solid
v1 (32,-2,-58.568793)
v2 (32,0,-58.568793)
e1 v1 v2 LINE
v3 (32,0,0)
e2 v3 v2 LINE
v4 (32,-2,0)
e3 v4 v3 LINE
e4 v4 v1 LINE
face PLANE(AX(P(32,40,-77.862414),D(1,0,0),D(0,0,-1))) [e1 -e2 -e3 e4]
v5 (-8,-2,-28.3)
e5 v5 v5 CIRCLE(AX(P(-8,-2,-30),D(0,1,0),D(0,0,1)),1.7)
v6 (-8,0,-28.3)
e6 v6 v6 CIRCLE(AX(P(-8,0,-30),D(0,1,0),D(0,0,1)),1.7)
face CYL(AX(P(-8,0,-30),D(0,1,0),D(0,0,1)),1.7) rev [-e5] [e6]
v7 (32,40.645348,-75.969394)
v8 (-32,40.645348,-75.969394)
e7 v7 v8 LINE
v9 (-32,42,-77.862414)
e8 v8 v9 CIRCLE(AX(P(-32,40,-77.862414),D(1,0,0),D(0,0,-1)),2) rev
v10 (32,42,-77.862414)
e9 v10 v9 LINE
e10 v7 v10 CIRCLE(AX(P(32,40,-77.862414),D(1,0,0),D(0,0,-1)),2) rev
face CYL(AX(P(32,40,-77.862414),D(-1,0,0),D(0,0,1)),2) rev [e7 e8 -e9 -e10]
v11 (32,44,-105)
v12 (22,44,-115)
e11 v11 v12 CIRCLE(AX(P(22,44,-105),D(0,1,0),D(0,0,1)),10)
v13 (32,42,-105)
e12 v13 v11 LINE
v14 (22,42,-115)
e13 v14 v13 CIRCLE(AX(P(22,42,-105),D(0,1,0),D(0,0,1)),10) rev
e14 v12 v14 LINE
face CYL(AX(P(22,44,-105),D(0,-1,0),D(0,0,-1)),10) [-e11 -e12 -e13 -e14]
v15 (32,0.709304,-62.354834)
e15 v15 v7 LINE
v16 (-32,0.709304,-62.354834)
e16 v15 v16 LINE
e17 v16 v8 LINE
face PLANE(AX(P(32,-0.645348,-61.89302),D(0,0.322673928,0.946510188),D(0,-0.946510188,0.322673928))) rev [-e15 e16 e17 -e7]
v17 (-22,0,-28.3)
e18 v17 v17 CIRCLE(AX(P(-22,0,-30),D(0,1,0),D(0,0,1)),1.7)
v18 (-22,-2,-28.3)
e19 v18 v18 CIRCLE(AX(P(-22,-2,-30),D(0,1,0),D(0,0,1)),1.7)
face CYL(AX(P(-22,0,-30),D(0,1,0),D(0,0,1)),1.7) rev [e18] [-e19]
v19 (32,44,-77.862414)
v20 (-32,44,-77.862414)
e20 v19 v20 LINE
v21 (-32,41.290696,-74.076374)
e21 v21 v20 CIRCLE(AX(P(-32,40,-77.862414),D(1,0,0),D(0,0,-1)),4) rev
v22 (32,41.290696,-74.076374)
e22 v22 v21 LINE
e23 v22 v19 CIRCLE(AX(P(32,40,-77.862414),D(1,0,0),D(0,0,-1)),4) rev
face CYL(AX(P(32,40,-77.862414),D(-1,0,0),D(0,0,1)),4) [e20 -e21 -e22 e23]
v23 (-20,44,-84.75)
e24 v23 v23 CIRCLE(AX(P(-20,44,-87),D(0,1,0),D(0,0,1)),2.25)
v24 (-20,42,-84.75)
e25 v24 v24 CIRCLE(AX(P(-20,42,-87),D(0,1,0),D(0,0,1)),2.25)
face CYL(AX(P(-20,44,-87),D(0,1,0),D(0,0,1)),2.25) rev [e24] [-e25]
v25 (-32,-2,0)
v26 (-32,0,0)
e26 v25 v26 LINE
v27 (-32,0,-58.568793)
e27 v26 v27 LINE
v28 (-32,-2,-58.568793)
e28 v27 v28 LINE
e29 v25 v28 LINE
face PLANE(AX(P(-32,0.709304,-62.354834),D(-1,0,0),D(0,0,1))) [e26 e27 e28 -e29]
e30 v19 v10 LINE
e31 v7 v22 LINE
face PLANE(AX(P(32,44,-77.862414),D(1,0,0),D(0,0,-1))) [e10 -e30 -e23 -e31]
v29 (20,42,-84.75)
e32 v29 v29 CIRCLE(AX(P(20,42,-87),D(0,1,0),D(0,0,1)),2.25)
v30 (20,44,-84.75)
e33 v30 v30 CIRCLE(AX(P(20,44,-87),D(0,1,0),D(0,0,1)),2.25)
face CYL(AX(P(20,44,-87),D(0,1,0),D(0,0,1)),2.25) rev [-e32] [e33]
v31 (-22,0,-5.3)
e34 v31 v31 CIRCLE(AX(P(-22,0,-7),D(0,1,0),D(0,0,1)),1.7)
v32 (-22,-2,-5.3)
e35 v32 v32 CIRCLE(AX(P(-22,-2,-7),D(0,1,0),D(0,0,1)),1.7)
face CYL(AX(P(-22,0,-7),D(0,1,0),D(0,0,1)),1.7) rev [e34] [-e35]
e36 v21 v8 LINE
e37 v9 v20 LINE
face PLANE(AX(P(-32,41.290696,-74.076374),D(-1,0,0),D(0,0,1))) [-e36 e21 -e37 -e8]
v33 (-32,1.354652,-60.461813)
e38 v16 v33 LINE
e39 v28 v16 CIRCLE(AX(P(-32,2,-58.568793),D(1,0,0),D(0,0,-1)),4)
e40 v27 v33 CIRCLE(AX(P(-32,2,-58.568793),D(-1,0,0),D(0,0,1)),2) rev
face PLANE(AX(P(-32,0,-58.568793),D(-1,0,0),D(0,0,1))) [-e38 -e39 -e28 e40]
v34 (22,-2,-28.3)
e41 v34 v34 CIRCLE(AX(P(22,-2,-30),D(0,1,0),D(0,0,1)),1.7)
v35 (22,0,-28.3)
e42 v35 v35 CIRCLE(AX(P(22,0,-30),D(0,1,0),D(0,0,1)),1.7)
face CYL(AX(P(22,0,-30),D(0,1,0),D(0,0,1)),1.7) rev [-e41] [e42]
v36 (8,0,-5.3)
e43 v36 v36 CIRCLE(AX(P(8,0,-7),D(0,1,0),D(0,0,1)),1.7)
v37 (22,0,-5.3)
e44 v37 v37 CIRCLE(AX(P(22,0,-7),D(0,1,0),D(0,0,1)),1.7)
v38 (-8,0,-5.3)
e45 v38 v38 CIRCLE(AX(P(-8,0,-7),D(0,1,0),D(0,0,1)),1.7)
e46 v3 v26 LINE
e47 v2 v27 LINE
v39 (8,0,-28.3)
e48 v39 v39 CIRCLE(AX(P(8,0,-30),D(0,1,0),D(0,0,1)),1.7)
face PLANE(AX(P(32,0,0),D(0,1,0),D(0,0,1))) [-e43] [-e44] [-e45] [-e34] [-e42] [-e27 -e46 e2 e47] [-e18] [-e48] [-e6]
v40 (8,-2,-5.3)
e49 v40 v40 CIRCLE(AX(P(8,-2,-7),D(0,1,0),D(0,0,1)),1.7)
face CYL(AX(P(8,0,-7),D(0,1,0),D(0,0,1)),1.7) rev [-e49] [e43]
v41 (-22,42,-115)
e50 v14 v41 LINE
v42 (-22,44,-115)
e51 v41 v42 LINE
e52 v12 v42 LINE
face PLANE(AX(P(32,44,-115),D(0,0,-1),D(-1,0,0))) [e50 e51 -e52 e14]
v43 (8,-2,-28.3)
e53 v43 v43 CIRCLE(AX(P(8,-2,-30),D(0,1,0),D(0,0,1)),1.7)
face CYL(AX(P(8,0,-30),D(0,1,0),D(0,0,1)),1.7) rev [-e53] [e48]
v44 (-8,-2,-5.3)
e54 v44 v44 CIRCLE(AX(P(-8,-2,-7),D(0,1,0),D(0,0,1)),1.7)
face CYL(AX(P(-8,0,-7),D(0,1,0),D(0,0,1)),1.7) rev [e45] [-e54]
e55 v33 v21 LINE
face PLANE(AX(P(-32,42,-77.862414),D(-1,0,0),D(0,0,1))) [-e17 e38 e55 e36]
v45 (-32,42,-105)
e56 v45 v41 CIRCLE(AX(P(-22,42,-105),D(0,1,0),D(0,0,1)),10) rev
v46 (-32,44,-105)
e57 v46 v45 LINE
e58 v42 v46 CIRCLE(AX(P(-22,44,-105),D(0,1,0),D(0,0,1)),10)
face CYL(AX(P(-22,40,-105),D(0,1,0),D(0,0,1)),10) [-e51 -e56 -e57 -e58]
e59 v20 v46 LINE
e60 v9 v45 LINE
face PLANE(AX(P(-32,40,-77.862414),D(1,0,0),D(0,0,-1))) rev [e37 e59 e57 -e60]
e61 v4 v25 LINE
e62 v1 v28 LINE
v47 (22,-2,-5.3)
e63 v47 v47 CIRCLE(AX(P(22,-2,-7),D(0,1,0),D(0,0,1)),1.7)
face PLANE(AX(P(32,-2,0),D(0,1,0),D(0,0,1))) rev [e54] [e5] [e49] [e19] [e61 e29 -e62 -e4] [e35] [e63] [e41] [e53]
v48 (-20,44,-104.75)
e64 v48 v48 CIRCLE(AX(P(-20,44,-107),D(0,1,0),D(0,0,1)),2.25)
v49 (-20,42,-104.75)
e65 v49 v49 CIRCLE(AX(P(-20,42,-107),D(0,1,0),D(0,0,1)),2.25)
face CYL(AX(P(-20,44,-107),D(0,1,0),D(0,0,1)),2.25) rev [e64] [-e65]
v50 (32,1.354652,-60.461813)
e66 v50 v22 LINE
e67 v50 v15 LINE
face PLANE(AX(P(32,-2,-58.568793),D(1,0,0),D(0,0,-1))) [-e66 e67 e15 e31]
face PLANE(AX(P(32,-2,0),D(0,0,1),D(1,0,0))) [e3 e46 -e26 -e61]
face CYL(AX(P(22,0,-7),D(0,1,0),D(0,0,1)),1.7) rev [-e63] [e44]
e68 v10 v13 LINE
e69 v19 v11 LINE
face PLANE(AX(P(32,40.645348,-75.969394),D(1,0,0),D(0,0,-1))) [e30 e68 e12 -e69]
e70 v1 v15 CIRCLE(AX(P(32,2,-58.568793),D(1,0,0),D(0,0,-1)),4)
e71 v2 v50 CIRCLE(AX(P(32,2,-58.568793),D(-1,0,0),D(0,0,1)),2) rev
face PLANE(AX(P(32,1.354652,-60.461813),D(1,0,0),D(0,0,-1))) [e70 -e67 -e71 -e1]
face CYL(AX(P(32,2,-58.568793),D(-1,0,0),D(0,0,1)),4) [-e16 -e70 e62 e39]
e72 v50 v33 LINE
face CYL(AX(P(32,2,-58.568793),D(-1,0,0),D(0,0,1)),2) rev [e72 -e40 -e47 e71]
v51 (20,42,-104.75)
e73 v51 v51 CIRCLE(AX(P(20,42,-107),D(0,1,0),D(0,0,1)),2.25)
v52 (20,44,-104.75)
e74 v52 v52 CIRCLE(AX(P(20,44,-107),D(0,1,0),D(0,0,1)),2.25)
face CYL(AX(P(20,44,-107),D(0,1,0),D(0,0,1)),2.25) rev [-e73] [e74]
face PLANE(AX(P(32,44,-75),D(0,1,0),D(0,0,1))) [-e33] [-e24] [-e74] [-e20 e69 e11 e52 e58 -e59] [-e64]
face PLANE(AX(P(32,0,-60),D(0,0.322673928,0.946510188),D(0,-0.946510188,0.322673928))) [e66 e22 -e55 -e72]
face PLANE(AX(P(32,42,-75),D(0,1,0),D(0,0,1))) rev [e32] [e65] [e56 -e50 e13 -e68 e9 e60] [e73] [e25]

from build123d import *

# Parameters (mm, degrees)
BASE_FLANGE1_DEPTH   = 32
M3_CLEARANCE_HOLE1_D = 3.4
M4_CLEARANCE_HOLE1_D = 4.5
FILLET1_R            = 10


# Sheet-metal steps are written as plain solids
with BuildPart() as part:
    # Sketch1 → Base-Flange1 (new, symmetric)
    with BuildSketch(Plane(origin=(0, 0, 0), x_dir=(0, 0, -1), z_dir=(1, 0, 0))):
        with BuildLine():
            Line((0, 0), (58.568792855, 0))
            ThreePointArc((58.568792855, 0), (59.732688101, 0.373547463), (60.461813231, 1.354652144))
            Line((60.461813231, 1.354652144), (74.076373538, 41.290695711))
            ThreePointArc((74.076373538, 41.290695711), (75.534623798, 43.252905074), (77.862414291, 44))
            Line((77.862414291, 44), (115, 44))
            Line((115, 44), (115, 42))
            Line((115, 42), (77.862414291, 42))
            ThreePointArc((77.862414291, 42), (76.698519044, 41.626452537), (75.969393914, 40.645347856))
            Line((75.969393914, 40.645347856), (62.354833607, 0.709304289))
            ThreePointArc((62.354833607, 0.709304289), (60.896583347, -1.252905074), (58.568792855, -2))
            Line((58.568792855, -2), (0, -2))
            Line((0, -2), (0, 0))
        make_face()
    extrude(amount=BASE_FLANGE1_DEPTH, both=True)

    # M3 Clearance Hole1 (through all)
    with Locations(Plane(origin=(0, 0, 0), x_dir=(1, 0, 0), z_dir=(0, 1, 0))):
        with Locations((-22, 30), (-22, 7), (-8, 7), (-8, 30), (8, 30), (8, 7), (22, 7), (22, 30)):
            Hole(M3_CLEARANCE_HOLE1_D / 2)

    # M4 Clearance Hole1 (through all)
    with Locations(Plane(origin=(0, 44, 0), x_dir=(1, 0, 0), z_dir=(0, 1, 0))):
        with Locations((-20, 107), (-20, 87), (20, 87), (20, 107)):
            Hole(M4_CLEARANCE_HOLE1_D / 2)

    # Fillet1
    fillet1_edges = [part.edges().sort_by_distance(p)[0] for p in [
        (-32, 43, -115),
        (32, 43, -115),
    ]]
    fillet(fillet1_edges, radius=FILLET1_R)


solid = part.part
